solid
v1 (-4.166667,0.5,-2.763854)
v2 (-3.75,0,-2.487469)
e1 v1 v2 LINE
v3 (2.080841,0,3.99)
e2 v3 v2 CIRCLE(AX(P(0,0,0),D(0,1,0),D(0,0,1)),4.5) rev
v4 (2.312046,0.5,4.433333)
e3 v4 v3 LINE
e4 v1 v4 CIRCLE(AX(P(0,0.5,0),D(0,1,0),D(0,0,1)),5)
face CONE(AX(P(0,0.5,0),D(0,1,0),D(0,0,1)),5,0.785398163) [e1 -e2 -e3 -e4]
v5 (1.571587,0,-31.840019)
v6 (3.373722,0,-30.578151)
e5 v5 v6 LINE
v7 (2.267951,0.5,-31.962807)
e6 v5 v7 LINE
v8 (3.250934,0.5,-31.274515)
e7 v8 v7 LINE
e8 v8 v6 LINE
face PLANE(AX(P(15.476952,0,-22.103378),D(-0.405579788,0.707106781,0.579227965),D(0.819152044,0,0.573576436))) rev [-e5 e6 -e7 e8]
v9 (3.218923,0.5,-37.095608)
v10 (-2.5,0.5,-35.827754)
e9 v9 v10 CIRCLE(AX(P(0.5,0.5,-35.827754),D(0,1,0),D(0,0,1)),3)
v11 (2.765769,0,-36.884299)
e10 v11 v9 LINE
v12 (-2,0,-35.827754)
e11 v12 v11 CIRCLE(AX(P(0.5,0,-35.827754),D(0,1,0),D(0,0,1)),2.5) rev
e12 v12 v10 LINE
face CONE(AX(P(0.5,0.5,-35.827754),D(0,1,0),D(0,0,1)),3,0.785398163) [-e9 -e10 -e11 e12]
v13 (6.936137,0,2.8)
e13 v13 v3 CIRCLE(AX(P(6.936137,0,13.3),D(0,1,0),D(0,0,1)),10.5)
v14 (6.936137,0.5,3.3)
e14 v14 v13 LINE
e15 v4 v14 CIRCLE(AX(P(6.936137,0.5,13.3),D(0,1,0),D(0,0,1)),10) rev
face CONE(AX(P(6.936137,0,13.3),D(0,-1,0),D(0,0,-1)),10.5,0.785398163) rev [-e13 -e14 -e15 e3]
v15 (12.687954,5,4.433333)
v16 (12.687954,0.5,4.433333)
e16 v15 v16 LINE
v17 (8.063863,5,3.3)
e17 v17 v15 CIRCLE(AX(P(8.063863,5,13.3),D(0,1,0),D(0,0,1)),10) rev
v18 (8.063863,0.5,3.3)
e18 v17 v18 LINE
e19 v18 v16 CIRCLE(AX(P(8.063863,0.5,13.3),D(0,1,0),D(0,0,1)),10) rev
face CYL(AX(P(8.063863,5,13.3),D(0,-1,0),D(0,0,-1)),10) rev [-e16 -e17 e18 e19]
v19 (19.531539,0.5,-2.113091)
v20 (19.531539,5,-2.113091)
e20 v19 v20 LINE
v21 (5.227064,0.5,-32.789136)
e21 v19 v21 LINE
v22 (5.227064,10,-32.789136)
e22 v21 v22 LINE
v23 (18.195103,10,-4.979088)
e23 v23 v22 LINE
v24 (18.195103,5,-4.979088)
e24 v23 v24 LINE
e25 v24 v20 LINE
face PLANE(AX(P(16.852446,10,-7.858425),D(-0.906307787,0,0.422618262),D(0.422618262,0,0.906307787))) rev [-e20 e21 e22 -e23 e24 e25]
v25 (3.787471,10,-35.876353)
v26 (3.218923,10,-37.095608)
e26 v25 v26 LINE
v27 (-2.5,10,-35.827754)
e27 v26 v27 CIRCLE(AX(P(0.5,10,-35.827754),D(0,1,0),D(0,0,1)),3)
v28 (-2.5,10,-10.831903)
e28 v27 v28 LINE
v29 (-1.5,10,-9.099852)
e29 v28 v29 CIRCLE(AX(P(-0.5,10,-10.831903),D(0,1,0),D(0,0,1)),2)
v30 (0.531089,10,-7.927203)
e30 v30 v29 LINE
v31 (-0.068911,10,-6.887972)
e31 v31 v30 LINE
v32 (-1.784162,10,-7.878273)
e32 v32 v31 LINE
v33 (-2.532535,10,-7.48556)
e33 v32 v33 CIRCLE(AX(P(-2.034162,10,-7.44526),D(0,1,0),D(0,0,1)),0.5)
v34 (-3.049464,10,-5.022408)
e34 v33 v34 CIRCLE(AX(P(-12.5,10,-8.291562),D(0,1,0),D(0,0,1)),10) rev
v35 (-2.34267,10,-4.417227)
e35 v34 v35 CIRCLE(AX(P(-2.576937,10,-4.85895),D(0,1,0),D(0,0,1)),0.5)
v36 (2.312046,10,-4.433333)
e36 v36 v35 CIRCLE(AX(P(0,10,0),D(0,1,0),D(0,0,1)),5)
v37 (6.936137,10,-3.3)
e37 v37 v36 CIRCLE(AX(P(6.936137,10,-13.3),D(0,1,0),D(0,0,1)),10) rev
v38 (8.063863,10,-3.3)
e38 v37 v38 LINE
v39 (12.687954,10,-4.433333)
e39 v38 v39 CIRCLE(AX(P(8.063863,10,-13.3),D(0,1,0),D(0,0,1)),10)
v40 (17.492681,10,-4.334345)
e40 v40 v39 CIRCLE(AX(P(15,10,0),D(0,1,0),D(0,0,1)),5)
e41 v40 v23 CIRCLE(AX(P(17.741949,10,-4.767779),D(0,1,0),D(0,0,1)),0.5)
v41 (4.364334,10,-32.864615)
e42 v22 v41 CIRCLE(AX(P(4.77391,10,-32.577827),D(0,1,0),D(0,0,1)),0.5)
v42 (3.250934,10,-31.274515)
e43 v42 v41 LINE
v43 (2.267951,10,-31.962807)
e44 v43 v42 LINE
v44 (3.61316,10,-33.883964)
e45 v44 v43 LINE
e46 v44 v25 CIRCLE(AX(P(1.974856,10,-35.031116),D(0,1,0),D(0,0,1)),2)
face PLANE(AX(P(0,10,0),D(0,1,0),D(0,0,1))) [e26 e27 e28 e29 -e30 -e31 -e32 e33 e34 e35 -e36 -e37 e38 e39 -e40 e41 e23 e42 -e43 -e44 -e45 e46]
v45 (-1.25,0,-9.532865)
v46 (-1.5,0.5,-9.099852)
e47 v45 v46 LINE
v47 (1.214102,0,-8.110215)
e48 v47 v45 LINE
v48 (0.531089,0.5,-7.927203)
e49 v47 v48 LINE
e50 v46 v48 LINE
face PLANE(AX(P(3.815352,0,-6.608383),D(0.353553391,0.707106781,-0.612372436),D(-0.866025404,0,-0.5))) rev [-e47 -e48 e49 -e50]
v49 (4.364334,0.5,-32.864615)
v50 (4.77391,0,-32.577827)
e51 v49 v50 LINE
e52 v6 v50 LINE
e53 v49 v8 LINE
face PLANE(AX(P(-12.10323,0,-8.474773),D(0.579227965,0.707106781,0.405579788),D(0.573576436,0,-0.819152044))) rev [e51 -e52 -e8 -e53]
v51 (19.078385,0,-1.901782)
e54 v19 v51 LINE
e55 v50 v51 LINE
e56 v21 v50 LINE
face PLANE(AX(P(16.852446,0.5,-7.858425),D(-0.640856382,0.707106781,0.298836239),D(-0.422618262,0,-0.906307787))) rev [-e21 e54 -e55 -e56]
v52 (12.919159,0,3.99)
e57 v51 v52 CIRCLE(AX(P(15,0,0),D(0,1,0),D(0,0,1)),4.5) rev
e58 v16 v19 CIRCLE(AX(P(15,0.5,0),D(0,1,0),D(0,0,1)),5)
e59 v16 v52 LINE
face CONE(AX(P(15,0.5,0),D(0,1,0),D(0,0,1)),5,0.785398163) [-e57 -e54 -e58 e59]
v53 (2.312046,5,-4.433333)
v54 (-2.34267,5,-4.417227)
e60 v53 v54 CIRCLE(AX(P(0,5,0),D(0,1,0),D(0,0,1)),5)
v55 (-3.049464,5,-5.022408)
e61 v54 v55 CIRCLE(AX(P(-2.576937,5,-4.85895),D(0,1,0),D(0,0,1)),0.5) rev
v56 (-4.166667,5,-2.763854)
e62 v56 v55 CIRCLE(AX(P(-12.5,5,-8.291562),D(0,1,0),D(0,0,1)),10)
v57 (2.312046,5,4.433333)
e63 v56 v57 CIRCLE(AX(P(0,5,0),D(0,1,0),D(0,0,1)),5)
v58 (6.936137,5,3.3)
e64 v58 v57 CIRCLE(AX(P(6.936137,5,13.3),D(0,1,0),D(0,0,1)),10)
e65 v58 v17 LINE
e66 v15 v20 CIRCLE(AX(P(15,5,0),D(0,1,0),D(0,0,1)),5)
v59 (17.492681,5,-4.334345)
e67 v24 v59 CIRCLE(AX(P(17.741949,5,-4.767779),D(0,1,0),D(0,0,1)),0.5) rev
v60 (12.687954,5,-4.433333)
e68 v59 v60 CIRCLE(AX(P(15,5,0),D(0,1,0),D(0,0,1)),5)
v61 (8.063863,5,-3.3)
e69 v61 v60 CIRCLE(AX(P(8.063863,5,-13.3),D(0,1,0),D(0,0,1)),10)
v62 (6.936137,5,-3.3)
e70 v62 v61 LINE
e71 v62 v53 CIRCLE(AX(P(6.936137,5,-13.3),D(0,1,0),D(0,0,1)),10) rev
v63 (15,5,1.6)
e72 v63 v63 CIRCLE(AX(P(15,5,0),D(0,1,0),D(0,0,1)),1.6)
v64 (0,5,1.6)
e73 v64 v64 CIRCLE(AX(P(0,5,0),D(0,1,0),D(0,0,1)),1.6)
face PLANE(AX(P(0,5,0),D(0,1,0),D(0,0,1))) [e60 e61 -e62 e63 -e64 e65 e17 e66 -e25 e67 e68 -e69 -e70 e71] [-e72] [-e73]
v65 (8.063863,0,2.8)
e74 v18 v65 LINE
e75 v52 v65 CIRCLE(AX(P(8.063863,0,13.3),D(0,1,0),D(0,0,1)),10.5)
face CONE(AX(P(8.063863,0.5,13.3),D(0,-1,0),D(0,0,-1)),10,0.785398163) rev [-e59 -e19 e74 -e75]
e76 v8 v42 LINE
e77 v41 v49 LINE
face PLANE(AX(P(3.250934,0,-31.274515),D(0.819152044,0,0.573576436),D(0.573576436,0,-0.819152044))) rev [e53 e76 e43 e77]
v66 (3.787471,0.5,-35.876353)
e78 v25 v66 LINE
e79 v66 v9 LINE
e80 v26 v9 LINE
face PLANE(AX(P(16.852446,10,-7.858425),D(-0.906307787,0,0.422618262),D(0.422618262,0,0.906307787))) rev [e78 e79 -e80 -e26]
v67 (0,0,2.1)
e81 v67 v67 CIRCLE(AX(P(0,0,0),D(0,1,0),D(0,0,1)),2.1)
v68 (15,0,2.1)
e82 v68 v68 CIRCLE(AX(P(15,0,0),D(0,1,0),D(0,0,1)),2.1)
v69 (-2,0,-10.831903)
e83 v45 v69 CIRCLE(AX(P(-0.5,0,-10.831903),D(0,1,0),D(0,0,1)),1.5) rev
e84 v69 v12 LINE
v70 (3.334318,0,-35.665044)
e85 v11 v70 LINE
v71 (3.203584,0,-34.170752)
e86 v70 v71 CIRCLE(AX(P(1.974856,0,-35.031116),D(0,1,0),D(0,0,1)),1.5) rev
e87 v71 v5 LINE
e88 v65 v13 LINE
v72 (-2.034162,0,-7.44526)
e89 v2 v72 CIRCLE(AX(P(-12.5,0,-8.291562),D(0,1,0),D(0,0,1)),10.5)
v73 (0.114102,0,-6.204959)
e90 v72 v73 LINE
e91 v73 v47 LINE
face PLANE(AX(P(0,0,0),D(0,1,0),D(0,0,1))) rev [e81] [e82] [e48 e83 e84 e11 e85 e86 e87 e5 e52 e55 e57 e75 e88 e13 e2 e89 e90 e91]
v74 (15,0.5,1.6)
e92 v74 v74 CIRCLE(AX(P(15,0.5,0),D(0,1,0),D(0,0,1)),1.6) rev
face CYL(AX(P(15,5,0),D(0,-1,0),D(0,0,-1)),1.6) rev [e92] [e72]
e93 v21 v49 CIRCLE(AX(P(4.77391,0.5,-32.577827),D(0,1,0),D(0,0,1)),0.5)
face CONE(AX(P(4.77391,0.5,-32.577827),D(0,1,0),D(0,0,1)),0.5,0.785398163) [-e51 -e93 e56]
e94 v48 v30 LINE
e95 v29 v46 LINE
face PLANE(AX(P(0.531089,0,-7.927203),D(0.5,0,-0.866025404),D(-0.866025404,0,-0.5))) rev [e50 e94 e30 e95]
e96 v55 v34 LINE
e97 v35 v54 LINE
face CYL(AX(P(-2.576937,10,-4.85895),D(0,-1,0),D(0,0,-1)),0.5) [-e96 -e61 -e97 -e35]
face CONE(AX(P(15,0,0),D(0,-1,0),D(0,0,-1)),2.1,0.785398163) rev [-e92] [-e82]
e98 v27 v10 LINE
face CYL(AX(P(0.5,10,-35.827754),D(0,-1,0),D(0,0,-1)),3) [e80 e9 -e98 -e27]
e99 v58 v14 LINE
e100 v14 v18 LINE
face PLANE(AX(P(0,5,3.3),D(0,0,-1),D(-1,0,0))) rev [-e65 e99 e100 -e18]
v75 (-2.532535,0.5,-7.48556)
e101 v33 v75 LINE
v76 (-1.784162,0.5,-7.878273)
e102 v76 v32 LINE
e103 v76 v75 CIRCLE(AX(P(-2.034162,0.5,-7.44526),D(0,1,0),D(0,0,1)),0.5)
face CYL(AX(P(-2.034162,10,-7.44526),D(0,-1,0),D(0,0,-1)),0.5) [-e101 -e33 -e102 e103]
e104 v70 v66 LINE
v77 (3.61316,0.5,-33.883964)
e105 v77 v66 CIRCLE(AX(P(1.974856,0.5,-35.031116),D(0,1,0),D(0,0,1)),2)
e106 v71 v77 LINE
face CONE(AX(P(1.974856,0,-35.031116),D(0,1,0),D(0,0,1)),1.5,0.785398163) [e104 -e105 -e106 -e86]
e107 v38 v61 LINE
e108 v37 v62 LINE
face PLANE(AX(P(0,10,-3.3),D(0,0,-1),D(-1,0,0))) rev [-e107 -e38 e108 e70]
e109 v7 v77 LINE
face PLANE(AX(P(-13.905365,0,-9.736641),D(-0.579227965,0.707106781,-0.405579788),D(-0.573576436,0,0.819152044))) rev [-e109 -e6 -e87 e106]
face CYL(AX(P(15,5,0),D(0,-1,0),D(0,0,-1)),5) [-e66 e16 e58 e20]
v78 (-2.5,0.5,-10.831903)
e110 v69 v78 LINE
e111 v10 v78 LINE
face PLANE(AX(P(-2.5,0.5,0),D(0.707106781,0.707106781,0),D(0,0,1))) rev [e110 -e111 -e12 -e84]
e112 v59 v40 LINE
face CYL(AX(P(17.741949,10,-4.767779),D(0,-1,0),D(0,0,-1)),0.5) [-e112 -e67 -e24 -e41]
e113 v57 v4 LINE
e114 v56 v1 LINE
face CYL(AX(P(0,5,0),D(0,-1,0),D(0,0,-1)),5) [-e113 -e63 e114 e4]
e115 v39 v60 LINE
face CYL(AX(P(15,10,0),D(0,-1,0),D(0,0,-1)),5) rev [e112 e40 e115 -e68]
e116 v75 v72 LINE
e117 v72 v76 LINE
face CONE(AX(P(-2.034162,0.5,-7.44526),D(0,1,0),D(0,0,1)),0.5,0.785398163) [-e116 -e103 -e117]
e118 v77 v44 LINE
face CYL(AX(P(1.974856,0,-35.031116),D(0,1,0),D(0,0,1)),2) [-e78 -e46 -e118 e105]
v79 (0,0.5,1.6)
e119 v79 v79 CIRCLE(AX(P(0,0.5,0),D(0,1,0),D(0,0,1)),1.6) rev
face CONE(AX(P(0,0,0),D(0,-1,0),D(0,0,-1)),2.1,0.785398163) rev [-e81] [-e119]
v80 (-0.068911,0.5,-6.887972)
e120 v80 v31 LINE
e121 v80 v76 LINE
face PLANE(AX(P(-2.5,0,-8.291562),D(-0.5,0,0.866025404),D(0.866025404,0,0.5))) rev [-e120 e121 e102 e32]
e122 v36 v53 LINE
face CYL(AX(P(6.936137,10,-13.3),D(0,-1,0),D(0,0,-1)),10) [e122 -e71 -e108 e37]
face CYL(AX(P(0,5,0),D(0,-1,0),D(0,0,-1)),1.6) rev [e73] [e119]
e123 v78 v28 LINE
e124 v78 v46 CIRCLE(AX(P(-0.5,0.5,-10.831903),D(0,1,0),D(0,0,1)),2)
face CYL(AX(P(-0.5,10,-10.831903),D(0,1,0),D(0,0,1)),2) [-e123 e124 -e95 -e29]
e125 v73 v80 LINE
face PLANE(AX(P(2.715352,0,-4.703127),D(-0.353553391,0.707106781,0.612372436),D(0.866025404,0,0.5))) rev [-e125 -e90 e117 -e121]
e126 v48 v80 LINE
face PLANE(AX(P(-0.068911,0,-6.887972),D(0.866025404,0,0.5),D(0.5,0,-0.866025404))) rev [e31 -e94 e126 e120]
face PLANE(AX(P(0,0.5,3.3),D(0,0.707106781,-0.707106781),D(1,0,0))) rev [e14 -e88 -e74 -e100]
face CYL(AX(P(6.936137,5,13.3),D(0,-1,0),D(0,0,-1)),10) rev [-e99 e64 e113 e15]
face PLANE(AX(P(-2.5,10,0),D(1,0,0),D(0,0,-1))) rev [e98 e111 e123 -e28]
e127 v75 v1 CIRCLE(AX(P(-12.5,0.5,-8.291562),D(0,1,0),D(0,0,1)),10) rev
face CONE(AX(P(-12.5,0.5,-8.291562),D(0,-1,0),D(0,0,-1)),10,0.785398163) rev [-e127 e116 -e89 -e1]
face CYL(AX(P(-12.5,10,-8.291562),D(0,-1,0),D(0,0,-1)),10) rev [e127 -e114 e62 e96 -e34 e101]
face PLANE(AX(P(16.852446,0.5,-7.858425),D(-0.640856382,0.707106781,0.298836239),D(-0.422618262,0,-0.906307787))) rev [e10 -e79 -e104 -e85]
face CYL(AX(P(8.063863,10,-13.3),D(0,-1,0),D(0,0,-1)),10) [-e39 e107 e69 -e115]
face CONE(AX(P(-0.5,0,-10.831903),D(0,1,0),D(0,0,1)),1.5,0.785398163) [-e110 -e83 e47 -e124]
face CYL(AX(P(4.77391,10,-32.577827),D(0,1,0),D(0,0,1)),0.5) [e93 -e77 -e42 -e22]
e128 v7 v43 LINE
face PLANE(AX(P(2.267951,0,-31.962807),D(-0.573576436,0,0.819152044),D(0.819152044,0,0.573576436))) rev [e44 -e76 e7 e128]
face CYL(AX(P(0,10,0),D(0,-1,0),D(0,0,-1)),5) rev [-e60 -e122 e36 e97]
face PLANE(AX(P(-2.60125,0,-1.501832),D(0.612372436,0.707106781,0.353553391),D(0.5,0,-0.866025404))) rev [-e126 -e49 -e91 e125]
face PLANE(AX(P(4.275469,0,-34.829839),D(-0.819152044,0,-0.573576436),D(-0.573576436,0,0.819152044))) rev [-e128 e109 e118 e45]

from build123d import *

# Parameters (mm, degrees)
MAIN_BODY_DEPTH                           = 10
SKETCH1_3_R                               = 1.6
CONNECTOR_BODY_DEPTH                      = 5
DULLING_FILLET_START                      = 5
DULLING_FILLET_DEPTH                      = 6
CUT_EXTRUDE1_DEPTH                        = 45.806187552
FILLET1_R                                 = 2
FILLET2_R                                 = 0.5
ELEPHANTSFOOT_COMPENSATION_LEFT_CONF_SIZE = 0.5


with BuildPart() as part:
    # complete_sketch → main_body (new body)
    with BuildSketch(Plane(origin=(0, 0, 0), x_dir=(1, 0, 0), z_dir=(0, 1, 0))):
        with BuildLine():
            ThreePointArc((-2.5, 8.291561976), (-2.925728922, 5.40481063), (-4.166666667, 2.763853992))
            ThreePointArc((-4.166666667, 2.763853992), (-1.24767584, 4.841828683), (2.312045751, 4.433333333))
            ThreePointArc((2.312045751, 4.433333333), (4.555661111, 3.587465144), (6.936137254, 3.3))
            Line((6.936137254, 3.3), (8.063862746, 3.3))
            ThreePointArc((8.063862746, 3.3), (10.444338889, 3.587465144), (12.687954249, 4.433333333))
            ThreePointArc((12.687954249, 4.433333333), (16.605433979, 4.735248857), (19.531538935, 2.113091309))
            Line((19.531538935, 2.113091309), (3.218923361, 37.095608299))
            ThreePointArc((3.218923361, 37.095608299), (-0.149318842, 38.756641535), (-2.5, 35.827753514))
            Line((-2.5, 35.827753514), (-2.5, 8.291561976))
        make_face()
    extrude(amount=MAIN_BODY_DEPTH)

    # Sketch1<3> → connector_body (add)
    with BuildSketch(Plane(origin=(0, 0, 0), x_dir=(1, 0, 0), z_dir=(0, 1, 0))):
        with BuildLine():
            ThreePointArc((2.312045751, -4.433333333), (4.555661111, -3.587465144), (6.936137254, -3.3))
            Line((6.936137254, -3.3), (8.063862746, -3.3))
            ThreePointArc((8.063862746, -3.3), (10.444338889, -3.587465144), (12.687954249, -4.433333333))
            ThreePointArc((12.687954249, -4.433333333), (18.456219958, -3.613107195), (19.531538935, 2.113091309))
            ThreePointArc((19.531538935, 2.113091309), (16.605433979, 4.735248857), (12.687954249, 4.433333333))
            ThreePointArc((12.687954249, 4.433333333), (10.444338889, 3.587465144), (8.063862746, 3.3))
            Line((8.063862746, 3.3), (6.936137254, 3.3))
            ThreePointArc((6.936137254, 3.3), (4.555661111, 3.587465144), (2.312045751, 4.433333333))
            ThreePointArc((2.312045751, 4.433333333), (-1.24767584, 4.841828683), (-4.166666667, 2.763853992))
            ThreePointArc((-4.166666667, 2.763853992), (-3.716151374, -3.345178466), (2.312045751, -4.433333333))
        make_face()
        with Locations(Location((0, 0, 0), (0, 0, 270))):
            Circle(SKETCH1_3_R, mode=Mode.SUBTRACT)
        with Locations(Location((15, 0, 0), (0, 0, 270))):
            Circle(SKETCH1_3_R, mode=Mode.SUBTRACT)
    extrude(amount=CONNECTOR_BODY_DEPTH)

    # dulling_fillet: read off the stored shape, not the designer's step
    # dulling_fillet outline → dulling_fillet (cut)
    with BuildSketch(Plane(origin=(0, 0, 0), x_dir=(1, 0, 0), z_dir=(0, 1, 0)).offset(DULLING_FILLET_START)):
        with BuildLine():
            Line((19.531538935, 2.113091309), (18.195102647, 4.979088177))
            ThreePointArc((18.195102647, 4.979088177), (18.080055144, 4.399425861), (17.492680685, 4.334344587))
            ThreePointArc((17.492680685, 4.334344587), (18.683531845, 3.381063908), (19.531538935, 2.113091309))
        make_face()
        with BuildLine():
            ThreePointArc((-4.166666667, 2.763853992), (-3.358016887, 3.704554303), (-2.342670216, 4.417227214))
            ThreePointArc((-2.342670216, 4.417227214), (-2.902133749, 4.479151002), (-3.049464036, 5.022407651))
            ThreePointArc((-3.049464036, 5.022407651), (-3.536643042, 3.85780149), (-4.166666667, 2.763853992))
        make_face()
    extrude(amount=DULLING_FILLET_DEPTH, mode=Mode.SUBTRACT)

    # Sketch2 → Cut-Extrude1 (cut, through all)
    with BuildSketch(Plane(origin=(0, 10, 0), x_dir=(1, 0, 0), z_dir=(0, 1, 0))):
        Polygon((-2.5, 8.291561976), (-0.068911087, 6.887972137), (0.531088913, 7.927202622), (-2.5, 9.677202622), align=None)
        Polygon((4.275469015, 34.829838831), (2.267951488, 31.962806676), (3.250933941, 31.274514953), (4.861066057, 33.574021924), align=None)
    extrude(amount=-CUT_EXTRUDE1_DEPTH, mode=Mode.SUBTRACT)

    # Fillet1
    fillet1_edges = [part.edges().sort_by_distance(p)[0] for p in [
        (-2.5, 5, -9.677202622),
        (4.275469015, 5, -34.829838831),
    ]]
    fillet(fillet1_edges, radius=FILLET1_R)

    # Fillet2
    fillet2_edges = [part.edges().sort_by_distance(p)[0] for p in [
        (4.861066057, 5, -33.574021924),
        (-2.5, 5, -8.291561976),
    ]]
    fillet(fillet2_edges, radius=FILLET2_R)

    # elephantsfoot_compensation_left_conf
    elephantsfoot_compensation_left_conf_edges = [part.edges().sort_by_distance(p)[0] for p in [
        (-0.484455543, 0, -8.513527487),
        (0.231088913, 0, -7.40758738),
        (3.807634117, 0, -32.069565198),
        (2.759442715, 0, -31.618660815),
        (-2.5, 0, -23.329828337),
        (-0.149318842, 0, -38.756641535),
        (2.940555742, 0, -32.923385101),
        (3.503197421, 0, -36.48598061),
        (-2.232050808, 0, -9.83190316),
        (12.379301571, 0, -17.451113833),
        (3.967245303, 0, -34.856804912),
        (-3.049950658, 0, -5.021001256),
        (-0.926536362, 0, -7.383122321),
        (-2.266493544, 0, -7.888003391),
        (4.817488185, 0, -33.075924575),
        (-3.716151374, 0, 3.345178466),
        (18.456219958, 0, 3.613107195),
        (7.5, 0, 3.3),
        (10.444338889, 0, 3.587465144),
        (0, 0, -1.6),
        (15, 0, -1.6),
        (4.555661111, 0, 3.587465144),
    ]]
    chamfer(elephantsfoot_compensation_left_conf_edges, length=ELEPHANTSFOOT_COMPENSATION_LEFT_CONF_SIZE)


solid = part.part
